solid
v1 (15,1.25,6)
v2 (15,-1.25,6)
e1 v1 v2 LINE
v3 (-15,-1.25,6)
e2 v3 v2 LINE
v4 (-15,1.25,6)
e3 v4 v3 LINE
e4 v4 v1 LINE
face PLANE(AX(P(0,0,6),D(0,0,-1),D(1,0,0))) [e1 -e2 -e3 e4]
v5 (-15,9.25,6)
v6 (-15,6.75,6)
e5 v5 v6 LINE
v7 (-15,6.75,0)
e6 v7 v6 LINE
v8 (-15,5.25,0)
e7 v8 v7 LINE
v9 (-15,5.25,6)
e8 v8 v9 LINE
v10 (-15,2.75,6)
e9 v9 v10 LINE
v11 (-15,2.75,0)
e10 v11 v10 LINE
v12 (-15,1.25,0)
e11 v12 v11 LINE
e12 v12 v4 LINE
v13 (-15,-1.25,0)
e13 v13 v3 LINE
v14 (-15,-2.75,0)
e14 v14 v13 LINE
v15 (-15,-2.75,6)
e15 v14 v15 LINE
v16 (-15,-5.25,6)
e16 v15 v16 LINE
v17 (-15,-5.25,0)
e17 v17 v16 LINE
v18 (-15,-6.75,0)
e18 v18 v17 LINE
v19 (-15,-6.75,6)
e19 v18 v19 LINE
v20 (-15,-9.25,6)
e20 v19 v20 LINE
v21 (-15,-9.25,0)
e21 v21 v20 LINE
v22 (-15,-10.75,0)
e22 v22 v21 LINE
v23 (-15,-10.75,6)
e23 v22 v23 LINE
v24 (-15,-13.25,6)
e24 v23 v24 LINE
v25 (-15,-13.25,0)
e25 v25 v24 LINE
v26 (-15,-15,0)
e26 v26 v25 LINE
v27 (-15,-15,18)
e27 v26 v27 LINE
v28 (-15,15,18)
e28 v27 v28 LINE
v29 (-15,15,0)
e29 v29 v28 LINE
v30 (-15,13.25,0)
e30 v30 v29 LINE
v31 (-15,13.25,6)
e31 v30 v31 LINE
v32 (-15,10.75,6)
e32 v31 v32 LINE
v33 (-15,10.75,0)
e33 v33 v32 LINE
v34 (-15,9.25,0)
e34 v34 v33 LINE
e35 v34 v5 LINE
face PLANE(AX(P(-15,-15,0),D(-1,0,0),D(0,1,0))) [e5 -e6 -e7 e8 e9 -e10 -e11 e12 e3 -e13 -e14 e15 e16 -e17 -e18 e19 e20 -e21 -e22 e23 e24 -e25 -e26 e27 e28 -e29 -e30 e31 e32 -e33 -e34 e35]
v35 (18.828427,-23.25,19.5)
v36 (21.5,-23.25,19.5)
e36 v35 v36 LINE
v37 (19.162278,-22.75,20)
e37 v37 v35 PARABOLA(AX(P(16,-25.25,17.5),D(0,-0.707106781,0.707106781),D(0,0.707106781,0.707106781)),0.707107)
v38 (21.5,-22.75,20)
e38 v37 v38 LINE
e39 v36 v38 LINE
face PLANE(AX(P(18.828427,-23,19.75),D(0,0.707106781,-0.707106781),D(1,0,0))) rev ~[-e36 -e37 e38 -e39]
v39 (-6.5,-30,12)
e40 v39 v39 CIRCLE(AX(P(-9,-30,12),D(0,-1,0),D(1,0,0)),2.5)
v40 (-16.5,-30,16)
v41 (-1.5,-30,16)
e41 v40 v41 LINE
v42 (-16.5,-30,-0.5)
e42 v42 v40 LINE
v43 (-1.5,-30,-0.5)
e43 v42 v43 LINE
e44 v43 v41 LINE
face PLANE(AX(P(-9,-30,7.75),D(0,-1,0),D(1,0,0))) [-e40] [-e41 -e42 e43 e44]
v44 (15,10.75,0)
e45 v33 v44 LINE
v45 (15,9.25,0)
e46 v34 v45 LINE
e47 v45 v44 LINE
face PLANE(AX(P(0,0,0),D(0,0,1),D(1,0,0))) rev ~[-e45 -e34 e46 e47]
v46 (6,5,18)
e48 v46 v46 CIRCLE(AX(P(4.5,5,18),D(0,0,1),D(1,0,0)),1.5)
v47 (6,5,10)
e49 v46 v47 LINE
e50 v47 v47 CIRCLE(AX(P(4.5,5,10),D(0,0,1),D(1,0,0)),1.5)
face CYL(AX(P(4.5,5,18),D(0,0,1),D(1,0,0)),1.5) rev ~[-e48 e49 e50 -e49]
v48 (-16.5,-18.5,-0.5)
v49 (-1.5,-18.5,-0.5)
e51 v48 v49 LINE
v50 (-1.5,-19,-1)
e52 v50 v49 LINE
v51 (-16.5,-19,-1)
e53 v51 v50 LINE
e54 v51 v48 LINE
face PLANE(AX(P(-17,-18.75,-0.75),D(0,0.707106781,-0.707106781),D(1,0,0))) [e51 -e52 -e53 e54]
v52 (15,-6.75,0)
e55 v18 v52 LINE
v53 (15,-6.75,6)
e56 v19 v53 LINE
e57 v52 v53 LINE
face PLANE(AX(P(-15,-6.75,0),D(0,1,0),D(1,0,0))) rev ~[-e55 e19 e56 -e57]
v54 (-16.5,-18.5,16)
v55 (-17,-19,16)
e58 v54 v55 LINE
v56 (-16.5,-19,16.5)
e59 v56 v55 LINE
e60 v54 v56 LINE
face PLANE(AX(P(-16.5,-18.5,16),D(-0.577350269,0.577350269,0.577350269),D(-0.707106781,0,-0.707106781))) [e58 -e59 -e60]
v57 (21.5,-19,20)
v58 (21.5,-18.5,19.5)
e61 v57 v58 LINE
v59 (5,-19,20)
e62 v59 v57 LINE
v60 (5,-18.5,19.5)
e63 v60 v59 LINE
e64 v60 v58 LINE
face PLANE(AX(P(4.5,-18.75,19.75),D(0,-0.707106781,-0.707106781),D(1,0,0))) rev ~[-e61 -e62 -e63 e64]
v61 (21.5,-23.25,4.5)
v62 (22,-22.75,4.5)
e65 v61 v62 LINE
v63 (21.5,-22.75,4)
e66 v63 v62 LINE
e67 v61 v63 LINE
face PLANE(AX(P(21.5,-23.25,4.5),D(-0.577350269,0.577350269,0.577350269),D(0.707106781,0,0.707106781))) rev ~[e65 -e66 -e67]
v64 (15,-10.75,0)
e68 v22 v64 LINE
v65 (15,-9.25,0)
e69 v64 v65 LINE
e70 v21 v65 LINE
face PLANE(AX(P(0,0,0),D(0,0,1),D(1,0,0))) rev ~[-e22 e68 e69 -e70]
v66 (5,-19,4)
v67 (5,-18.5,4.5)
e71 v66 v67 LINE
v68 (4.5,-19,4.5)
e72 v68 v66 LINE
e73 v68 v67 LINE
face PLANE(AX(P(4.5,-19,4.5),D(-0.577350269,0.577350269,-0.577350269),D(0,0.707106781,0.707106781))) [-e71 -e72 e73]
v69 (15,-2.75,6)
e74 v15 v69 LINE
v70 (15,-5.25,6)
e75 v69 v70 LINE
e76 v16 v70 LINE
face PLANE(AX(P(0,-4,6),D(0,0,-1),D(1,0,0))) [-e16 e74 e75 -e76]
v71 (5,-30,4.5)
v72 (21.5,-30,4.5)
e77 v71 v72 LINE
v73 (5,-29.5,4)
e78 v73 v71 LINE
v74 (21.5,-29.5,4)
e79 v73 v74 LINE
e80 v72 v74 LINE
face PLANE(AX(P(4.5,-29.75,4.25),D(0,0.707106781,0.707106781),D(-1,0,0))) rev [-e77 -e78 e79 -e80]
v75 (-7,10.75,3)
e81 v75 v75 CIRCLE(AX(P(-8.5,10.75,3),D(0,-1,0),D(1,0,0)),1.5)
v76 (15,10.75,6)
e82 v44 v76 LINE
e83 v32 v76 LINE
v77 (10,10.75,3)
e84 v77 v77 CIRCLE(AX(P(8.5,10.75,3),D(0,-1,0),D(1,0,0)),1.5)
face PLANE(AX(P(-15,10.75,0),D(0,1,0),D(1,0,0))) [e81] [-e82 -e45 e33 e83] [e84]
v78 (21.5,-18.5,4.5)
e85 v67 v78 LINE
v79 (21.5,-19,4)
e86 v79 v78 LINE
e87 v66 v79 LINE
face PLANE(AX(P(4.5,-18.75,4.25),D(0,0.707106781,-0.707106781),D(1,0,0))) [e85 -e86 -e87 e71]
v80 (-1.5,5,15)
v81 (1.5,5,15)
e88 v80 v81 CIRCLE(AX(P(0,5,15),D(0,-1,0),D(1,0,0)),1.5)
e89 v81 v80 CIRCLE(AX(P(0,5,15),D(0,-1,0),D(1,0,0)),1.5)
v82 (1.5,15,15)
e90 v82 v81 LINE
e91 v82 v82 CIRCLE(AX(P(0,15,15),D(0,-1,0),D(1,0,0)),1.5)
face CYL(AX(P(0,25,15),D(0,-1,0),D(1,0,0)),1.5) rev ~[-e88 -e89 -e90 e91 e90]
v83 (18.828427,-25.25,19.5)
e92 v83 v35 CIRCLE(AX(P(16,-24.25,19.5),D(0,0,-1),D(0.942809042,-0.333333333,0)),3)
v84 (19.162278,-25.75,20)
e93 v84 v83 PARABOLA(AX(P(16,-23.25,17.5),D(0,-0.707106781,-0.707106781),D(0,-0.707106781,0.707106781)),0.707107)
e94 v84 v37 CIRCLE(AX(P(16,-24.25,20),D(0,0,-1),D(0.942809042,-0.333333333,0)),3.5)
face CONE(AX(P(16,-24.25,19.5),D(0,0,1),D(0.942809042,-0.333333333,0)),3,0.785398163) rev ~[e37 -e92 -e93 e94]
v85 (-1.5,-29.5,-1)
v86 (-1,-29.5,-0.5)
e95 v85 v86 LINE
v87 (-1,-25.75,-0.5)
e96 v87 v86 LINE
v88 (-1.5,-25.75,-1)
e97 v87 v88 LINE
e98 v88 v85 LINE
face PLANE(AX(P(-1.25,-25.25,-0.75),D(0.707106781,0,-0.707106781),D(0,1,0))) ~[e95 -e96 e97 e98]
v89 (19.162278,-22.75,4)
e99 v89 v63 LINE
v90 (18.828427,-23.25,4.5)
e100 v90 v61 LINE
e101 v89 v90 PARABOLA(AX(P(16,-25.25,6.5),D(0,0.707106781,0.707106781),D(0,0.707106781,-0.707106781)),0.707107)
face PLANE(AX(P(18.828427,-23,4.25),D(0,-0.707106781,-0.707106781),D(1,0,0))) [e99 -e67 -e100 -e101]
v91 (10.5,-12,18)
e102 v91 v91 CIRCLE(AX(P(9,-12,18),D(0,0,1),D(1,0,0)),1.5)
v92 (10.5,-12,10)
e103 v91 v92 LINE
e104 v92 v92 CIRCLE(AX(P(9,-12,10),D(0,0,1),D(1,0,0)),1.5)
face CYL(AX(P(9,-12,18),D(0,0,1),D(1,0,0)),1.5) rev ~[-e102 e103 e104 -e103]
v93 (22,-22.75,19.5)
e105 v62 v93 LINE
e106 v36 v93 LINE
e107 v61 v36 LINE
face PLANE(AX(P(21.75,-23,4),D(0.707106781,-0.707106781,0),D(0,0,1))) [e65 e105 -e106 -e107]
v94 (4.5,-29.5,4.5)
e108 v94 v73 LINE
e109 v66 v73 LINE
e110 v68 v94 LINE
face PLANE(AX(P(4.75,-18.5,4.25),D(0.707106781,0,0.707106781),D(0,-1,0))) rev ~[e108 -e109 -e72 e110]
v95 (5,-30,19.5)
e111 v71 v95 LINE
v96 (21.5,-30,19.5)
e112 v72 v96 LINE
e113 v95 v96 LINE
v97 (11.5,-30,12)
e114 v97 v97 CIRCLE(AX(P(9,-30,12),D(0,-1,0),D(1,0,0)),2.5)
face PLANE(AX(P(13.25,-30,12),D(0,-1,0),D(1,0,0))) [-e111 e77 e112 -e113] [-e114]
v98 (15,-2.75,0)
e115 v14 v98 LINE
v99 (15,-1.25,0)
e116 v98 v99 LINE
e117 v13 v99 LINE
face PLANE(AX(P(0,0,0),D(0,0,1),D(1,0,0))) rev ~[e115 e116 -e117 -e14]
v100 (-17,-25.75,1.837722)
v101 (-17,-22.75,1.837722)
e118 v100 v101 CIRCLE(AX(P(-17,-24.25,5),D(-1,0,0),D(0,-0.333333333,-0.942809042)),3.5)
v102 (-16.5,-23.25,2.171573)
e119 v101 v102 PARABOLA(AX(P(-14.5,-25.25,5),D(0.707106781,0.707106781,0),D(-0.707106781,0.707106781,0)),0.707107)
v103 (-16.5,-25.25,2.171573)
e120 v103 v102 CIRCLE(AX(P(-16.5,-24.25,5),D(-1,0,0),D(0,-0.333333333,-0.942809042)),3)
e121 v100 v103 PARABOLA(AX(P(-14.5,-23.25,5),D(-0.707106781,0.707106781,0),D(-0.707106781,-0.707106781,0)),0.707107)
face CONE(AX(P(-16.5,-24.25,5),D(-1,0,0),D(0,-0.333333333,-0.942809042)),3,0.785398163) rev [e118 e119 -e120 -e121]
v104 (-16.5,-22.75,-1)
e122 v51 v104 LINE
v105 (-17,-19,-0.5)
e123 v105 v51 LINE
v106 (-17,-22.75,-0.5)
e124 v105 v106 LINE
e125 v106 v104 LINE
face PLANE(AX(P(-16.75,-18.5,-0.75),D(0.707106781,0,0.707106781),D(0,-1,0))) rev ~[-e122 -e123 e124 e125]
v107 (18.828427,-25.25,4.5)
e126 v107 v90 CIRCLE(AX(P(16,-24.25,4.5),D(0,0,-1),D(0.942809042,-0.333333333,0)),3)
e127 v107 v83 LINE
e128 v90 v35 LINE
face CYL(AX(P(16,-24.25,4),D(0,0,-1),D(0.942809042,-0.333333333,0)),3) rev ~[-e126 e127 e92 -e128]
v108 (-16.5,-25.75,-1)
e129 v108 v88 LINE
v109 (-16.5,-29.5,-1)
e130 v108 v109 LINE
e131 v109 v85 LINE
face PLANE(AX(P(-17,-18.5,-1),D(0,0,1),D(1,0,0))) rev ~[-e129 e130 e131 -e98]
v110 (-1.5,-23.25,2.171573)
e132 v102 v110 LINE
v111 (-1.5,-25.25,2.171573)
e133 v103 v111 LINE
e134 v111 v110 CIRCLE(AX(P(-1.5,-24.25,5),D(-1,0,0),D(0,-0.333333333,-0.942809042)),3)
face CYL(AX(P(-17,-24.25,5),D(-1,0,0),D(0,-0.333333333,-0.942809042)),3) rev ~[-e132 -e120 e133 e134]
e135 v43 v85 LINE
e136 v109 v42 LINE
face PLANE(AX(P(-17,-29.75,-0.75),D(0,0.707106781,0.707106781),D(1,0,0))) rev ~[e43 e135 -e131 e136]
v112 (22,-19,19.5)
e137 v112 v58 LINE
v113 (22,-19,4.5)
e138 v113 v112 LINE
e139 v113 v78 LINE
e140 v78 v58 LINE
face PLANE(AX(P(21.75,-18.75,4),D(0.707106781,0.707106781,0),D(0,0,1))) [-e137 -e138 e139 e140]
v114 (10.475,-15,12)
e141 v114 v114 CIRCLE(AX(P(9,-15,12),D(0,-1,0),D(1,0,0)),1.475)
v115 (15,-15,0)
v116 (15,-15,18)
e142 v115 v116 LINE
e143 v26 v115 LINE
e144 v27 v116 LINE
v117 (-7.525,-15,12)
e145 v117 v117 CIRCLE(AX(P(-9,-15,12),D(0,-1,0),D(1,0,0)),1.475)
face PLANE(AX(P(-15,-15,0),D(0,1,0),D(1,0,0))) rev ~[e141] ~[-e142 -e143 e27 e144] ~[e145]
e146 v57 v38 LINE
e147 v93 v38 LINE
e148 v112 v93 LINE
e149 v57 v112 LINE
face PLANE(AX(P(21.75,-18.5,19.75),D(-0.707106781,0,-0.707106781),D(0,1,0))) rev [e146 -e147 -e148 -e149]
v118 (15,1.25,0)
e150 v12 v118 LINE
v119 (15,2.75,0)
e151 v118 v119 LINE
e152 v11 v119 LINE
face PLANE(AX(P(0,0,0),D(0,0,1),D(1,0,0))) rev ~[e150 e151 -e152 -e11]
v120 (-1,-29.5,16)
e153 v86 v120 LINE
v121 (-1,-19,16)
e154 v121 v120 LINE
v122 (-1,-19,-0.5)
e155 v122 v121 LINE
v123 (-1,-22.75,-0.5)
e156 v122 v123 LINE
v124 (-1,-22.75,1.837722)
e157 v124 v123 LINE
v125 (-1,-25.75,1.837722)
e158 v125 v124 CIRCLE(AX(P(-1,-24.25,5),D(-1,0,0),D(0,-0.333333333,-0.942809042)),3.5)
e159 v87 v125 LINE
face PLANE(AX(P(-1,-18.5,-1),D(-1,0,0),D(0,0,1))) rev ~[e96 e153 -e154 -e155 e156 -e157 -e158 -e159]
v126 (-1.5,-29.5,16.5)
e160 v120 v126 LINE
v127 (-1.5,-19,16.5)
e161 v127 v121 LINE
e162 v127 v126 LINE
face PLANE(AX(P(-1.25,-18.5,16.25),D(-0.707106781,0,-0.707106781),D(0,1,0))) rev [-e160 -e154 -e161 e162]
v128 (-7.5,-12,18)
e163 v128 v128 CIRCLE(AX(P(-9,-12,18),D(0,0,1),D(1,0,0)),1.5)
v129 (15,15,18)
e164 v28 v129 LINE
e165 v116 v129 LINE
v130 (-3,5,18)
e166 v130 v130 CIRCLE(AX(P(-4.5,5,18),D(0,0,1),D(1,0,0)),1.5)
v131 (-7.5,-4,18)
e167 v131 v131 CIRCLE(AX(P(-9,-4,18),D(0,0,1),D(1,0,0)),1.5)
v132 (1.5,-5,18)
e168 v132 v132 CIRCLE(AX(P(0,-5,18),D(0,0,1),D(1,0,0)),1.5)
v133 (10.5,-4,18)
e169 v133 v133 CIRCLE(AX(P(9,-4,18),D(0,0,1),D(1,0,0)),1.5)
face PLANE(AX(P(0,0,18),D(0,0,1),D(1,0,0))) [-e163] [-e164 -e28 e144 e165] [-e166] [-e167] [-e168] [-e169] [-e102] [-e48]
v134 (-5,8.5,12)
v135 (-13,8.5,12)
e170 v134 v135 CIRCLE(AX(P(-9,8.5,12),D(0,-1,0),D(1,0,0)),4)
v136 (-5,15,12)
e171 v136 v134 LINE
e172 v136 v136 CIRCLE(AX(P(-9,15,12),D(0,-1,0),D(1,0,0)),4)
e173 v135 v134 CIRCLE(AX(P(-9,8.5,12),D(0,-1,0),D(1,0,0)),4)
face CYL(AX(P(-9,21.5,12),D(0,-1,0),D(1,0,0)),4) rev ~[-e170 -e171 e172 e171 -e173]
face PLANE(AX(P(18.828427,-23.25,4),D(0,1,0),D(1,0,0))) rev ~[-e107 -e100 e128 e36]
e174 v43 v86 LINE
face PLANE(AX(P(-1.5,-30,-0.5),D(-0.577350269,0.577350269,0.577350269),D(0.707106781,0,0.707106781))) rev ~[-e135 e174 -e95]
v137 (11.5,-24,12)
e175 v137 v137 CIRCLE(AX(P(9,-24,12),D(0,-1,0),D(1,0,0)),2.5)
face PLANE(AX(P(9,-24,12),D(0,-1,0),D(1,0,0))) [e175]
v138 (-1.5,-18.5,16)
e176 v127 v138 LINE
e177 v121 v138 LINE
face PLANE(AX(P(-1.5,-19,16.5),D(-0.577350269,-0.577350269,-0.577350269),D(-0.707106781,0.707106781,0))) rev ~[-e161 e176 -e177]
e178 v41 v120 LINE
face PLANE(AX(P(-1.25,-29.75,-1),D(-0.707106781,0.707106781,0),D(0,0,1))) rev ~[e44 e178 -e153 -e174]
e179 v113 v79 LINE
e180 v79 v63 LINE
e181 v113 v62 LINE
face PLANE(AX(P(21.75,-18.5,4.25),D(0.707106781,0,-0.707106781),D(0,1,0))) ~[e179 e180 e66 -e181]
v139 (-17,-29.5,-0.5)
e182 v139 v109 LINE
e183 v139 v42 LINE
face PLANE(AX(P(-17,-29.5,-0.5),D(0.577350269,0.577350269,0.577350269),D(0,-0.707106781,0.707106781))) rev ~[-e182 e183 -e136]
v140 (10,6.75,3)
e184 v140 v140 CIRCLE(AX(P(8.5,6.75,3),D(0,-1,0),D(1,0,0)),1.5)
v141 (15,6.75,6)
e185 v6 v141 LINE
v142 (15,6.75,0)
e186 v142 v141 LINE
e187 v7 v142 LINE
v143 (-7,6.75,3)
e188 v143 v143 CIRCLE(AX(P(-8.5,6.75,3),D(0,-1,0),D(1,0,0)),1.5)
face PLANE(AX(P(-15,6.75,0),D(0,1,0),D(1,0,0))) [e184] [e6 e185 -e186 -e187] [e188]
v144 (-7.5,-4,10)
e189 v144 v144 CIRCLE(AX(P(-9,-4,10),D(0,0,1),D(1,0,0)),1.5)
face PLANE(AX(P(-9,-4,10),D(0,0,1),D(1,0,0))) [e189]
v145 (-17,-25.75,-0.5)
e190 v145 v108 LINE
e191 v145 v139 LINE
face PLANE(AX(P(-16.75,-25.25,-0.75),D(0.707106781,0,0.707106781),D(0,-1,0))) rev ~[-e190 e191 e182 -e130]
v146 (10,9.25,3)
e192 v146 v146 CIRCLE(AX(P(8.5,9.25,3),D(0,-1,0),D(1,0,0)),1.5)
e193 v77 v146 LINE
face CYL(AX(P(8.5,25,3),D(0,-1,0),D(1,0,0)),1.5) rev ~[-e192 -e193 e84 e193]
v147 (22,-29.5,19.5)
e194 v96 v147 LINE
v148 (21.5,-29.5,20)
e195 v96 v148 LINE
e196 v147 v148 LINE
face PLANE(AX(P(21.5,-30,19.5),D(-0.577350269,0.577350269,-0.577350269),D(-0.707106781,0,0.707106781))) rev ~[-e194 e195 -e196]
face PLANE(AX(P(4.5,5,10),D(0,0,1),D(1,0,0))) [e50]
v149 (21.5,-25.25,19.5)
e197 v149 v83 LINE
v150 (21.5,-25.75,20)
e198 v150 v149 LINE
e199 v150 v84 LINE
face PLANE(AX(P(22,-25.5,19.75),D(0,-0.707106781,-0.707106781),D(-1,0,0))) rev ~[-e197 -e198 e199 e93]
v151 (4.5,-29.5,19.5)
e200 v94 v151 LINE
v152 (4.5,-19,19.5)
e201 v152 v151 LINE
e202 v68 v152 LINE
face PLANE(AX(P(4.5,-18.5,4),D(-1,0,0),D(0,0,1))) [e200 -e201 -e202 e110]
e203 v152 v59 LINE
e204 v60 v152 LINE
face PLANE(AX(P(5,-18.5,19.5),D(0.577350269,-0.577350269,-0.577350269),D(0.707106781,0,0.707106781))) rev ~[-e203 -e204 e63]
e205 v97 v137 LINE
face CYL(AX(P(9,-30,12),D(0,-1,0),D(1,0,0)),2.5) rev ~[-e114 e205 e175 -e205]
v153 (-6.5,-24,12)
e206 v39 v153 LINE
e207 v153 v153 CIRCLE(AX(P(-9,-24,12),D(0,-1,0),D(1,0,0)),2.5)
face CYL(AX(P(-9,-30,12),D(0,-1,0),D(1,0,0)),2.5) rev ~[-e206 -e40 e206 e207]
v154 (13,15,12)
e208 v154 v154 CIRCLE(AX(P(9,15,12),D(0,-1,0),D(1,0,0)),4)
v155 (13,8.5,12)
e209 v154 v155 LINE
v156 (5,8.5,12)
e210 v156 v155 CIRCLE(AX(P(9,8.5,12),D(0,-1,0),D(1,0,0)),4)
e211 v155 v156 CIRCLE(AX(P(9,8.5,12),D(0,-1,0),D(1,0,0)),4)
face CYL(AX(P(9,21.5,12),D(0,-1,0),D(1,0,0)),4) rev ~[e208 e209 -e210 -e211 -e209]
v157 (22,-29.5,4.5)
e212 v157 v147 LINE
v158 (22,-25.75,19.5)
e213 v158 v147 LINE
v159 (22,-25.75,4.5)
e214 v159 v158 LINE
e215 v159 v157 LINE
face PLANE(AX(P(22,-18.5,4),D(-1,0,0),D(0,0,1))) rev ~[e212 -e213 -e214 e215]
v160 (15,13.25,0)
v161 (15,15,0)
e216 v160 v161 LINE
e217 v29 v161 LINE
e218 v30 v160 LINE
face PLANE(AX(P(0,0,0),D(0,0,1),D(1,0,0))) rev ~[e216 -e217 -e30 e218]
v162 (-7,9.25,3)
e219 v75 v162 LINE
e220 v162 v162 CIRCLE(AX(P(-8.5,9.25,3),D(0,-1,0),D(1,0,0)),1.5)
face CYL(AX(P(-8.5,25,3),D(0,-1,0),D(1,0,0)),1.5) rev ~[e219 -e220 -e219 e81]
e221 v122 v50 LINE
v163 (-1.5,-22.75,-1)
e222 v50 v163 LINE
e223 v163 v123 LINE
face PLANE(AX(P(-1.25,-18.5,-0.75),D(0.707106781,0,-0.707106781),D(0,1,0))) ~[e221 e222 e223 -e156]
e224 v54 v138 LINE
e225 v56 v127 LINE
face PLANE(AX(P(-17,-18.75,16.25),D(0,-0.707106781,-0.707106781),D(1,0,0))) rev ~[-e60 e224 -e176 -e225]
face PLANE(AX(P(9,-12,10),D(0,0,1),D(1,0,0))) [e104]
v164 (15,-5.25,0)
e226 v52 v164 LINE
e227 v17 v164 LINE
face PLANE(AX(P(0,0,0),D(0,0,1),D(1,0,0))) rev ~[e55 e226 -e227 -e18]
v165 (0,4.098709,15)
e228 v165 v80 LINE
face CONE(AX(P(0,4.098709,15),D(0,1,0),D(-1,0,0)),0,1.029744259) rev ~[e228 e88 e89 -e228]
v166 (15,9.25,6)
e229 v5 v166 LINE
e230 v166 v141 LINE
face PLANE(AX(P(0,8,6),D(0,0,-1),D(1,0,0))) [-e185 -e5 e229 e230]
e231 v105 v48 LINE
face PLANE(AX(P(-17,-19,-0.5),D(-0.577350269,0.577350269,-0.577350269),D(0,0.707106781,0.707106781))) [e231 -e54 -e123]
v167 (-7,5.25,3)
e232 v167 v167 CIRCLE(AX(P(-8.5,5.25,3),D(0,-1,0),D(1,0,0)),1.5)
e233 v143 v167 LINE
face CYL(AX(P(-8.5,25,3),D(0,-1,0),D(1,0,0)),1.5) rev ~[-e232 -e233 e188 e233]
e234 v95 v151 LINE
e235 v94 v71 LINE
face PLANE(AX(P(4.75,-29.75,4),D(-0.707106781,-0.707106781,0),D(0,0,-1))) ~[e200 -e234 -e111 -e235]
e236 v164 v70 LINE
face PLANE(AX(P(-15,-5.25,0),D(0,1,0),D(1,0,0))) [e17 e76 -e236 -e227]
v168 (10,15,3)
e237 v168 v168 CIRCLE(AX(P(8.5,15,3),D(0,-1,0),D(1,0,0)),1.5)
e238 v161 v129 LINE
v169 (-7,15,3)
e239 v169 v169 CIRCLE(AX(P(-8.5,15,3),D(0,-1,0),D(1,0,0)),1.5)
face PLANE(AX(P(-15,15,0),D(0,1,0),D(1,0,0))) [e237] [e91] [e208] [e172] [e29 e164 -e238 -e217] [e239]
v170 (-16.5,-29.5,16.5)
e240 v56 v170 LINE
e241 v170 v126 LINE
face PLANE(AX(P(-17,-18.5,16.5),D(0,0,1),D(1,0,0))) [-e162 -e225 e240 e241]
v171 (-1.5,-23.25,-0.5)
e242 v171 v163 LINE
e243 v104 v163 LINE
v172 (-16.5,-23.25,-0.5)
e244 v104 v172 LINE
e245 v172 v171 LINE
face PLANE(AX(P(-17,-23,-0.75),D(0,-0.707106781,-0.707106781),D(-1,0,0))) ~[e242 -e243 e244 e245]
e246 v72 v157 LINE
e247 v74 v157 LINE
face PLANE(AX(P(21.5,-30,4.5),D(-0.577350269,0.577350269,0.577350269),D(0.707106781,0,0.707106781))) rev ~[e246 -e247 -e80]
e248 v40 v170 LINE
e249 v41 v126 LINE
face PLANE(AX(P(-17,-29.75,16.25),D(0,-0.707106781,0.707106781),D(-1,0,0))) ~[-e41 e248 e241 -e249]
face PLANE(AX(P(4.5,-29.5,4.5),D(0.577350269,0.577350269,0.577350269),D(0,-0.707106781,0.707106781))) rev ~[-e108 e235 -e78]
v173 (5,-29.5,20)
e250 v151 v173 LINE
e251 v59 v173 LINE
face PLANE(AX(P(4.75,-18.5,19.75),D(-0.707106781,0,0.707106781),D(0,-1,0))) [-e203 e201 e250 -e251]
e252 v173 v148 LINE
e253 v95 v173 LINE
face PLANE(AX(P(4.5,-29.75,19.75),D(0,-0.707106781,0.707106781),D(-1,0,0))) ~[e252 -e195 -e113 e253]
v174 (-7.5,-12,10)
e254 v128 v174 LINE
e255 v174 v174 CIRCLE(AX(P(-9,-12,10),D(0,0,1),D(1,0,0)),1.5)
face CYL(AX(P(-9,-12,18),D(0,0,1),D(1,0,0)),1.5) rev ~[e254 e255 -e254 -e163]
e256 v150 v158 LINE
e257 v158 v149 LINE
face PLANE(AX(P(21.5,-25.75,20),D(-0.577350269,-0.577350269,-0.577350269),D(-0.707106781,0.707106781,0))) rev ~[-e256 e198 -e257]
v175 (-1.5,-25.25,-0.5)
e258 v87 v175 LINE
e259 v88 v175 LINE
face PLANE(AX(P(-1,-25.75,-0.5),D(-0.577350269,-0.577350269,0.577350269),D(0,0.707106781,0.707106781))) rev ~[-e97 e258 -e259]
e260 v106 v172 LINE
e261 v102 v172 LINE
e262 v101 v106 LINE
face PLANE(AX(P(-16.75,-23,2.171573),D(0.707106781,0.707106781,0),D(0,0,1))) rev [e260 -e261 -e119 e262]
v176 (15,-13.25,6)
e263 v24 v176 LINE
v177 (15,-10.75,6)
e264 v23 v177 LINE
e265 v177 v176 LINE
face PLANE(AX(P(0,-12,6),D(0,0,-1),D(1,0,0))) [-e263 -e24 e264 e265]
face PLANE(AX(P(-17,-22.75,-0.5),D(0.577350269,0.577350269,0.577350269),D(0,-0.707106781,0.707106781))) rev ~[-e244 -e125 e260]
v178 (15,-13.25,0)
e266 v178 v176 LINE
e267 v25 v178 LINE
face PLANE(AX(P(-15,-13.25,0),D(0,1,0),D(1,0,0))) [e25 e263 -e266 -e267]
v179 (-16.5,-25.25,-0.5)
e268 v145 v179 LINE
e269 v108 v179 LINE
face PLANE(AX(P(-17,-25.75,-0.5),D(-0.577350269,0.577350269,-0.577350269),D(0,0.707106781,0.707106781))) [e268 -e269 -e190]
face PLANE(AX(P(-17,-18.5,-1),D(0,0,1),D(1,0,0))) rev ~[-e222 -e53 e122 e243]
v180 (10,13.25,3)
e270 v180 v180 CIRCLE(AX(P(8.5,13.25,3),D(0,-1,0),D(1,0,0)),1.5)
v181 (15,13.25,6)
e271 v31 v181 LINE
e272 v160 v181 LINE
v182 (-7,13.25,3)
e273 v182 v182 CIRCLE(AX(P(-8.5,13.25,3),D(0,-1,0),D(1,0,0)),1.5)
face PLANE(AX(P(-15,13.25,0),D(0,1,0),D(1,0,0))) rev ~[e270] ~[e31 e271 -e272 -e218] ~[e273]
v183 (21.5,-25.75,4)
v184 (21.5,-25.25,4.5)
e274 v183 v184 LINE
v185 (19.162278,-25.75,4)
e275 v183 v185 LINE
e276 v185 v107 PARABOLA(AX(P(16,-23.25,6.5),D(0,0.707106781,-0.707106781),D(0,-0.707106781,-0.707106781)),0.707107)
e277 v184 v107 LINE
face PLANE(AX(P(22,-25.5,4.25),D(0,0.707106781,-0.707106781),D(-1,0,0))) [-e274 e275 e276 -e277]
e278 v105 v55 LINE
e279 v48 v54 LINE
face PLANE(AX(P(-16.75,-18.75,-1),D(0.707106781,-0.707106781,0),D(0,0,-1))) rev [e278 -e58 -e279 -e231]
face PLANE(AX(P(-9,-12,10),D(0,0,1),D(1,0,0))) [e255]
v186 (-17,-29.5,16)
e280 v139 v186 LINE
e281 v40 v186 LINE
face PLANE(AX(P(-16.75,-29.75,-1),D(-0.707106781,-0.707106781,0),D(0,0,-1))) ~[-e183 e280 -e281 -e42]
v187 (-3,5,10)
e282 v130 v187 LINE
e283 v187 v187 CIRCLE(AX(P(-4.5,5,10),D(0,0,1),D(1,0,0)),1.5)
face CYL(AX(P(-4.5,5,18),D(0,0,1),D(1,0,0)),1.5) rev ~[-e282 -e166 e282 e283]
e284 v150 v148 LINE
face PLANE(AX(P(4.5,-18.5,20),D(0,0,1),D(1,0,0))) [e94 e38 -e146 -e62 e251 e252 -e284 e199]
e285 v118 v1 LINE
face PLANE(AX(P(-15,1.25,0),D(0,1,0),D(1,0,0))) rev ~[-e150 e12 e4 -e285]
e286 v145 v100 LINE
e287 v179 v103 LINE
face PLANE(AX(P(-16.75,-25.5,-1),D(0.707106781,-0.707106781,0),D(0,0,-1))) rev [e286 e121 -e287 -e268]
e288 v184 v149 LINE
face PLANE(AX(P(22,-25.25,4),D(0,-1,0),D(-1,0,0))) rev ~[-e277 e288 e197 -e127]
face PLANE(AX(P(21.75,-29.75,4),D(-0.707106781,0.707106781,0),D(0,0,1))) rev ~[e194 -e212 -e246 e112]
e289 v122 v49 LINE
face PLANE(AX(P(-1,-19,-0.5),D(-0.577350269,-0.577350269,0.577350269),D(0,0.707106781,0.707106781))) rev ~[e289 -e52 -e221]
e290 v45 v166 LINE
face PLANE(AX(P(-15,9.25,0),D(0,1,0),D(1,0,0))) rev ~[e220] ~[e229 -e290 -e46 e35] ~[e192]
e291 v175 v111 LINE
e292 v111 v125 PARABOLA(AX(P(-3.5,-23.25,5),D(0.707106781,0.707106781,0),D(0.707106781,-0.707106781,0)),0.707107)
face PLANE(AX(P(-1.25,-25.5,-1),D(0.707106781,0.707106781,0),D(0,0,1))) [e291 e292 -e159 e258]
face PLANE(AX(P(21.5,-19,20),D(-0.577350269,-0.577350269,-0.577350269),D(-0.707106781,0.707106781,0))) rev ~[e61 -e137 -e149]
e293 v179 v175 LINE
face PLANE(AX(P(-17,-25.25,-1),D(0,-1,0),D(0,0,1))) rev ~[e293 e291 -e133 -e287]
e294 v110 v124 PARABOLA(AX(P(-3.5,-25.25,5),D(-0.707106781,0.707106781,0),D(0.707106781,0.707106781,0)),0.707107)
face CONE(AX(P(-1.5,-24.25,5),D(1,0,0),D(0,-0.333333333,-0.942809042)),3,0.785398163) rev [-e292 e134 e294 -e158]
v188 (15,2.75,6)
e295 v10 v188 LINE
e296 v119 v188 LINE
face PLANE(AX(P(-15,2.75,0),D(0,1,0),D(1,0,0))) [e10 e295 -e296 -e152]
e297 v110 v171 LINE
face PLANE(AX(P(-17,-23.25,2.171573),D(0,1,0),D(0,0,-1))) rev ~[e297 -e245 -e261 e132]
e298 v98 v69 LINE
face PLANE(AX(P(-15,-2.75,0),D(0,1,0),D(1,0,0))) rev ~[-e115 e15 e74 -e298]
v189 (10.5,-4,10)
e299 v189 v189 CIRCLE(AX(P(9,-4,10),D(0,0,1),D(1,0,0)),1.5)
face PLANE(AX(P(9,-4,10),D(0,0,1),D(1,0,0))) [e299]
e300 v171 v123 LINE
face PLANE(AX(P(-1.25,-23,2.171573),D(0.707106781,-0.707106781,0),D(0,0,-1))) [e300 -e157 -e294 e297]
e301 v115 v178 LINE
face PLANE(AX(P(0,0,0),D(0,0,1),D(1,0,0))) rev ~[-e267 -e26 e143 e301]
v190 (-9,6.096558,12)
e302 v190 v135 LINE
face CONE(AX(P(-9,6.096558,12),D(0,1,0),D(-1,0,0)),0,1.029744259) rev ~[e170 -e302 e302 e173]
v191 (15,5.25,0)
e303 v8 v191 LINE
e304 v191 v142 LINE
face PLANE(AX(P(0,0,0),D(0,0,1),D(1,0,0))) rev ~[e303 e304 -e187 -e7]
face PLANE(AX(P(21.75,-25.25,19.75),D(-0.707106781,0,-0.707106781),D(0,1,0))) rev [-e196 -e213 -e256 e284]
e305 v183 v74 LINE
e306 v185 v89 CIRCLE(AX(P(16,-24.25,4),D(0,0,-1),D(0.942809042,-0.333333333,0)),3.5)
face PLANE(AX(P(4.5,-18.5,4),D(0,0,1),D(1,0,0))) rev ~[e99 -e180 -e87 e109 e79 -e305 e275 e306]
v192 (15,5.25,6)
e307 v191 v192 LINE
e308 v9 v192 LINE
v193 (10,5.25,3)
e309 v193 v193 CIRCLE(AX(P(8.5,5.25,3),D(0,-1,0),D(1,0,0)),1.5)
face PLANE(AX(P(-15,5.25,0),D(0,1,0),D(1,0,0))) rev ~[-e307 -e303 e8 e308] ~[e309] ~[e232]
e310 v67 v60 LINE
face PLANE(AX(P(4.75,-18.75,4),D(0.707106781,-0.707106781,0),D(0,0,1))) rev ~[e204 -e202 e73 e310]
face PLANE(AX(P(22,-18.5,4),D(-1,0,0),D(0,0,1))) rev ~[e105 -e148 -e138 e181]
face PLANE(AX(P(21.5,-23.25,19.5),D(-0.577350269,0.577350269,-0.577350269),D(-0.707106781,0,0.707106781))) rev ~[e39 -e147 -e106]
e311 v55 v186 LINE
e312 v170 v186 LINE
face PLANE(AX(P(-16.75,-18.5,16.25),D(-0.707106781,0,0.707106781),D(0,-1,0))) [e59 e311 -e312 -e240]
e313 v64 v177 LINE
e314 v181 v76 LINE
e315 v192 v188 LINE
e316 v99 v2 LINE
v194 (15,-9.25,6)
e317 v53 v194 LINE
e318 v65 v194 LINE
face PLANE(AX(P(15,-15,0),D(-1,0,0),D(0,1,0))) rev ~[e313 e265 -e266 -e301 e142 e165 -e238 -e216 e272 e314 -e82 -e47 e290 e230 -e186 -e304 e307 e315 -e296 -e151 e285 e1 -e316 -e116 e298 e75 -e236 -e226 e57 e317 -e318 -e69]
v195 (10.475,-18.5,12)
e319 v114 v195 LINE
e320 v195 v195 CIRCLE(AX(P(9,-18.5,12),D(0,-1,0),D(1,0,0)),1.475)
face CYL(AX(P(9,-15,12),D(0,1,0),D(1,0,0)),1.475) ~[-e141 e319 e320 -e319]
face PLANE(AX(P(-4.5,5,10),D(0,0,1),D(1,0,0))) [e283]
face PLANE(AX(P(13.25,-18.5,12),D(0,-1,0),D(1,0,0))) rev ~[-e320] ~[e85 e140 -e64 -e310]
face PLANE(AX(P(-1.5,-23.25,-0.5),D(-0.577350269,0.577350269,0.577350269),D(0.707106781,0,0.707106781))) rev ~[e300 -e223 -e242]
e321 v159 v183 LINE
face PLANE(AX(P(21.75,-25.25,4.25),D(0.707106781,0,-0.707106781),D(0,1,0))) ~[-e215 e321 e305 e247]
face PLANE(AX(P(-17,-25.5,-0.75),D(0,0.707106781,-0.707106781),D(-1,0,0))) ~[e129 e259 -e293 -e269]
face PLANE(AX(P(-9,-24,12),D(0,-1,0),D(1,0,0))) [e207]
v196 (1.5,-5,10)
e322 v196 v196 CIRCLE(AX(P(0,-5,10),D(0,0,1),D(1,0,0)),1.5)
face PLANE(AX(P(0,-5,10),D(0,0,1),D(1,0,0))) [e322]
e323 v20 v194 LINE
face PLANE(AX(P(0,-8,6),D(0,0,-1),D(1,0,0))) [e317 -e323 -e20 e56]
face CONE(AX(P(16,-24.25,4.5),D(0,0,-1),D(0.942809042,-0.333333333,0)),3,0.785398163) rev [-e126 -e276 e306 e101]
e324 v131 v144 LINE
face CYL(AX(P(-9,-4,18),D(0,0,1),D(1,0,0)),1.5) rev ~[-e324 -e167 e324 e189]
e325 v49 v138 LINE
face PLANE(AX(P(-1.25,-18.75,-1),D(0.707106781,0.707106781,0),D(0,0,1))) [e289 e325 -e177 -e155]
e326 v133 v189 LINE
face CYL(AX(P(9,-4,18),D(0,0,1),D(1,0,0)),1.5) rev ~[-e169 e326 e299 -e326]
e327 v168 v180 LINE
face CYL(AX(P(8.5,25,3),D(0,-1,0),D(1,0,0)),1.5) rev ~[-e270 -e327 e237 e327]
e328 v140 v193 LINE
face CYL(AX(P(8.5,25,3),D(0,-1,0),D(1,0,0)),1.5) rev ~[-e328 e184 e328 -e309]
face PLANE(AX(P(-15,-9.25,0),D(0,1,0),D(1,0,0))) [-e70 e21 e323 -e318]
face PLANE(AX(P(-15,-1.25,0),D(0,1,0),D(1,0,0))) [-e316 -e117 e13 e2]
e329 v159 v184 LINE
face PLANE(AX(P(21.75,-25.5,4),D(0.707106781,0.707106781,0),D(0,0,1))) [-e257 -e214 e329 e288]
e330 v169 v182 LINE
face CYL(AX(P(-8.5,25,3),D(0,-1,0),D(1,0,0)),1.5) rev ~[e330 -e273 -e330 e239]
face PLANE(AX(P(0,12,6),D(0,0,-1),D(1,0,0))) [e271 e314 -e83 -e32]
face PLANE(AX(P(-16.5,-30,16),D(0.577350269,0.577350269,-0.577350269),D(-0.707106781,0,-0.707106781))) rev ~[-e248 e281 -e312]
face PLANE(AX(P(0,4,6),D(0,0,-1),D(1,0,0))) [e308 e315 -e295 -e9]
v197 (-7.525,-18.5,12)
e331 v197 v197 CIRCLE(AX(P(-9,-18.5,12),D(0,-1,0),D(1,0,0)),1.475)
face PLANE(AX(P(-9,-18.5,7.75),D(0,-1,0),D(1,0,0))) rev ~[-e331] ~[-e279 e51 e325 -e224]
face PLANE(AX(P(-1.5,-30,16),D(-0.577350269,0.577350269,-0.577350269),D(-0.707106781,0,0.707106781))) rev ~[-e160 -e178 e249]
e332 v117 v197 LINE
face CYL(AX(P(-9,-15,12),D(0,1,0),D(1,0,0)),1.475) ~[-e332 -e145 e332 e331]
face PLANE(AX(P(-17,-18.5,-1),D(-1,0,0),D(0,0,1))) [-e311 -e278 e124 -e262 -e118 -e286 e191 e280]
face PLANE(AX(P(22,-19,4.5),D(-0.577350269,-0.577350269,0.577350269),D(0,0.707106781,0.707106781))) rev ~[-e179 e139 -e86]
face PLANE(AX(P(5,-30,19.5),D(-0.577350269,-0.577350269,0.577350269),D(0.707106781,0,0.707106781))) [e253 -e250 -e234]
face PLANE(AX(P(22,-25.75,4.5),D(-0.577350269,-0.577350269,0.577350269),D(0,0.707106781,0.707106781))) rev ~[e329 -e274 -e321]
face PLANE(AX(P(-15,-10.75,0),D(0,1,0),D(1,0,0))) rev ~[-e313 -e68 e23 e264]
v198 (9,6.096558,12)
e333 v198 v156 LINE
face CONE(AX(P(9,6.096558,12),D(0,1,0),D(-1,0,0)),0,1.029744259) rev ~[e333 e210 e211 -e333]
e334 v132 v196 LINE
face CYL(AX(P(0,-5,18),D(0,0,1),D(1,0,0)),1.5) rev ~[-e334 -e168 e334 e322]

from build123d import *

# Parameters (mm, degrees)
F0_W      = 30
F0_H      = 30
F11_DEPTH = 18
F1_D      = 8
F1_DEPTH  = 6.5
F1_TIP    = 2.4034424761
F13_W     = 30
F13_H     = 2.5
F14_DEPTH = 6
F15_D     = 3
F15_DEPTH = 10
F15_TIP   = 0.9012909285
F2_R      = 1.475
F3_DEPTH  = 3.5
F17_W     = 16
F17_H     = 17.5
F16_W     = 17.5
F16_H     = 16
F18_DEPTH = 11.5
F5_DEPTH  = 16
F21_DEPTH = 16
F8_SIZE   = 0.5
F7_R      = 1.5
F9_DEPTH  = 8
F20_R     = 2.5
F19_R     = 2.5
F10_DEPTH = 6


# Not quite as in the source:
# - a feature names something its author has since deleted; it is built from what else it names


with BuildPart() as f11:
    # F0 (on Top) → F11 (new body)
    with BuildSketch(Plane.XY):
        Rectangle(F0_W, F0_H)
    extrude(amount=F11_DEPTH)

    # F1
    with Locations(Plane(origin=(0, 15, 0), x_dir=(-1, 0, 0), z_dir=(0, 1, 0))):
        with Locations((-9, 12), (9, 12)):
            Hole(F1_D / 2, depth=F1_DEPTH)
            with Locations((0, 0, -(F1_DEPTH + F1_TIP / 2))):  # 118° drill point
                Cone(0, F1_D / 2, F1_TIP, mode=Mode.SUBTRACT)

    # F13 (on face) → F14 (cut)
    with BuildSketch(Plane(origin=(0, 0, 0), x_dir=(1, 0, 0), z_dir=(0, 0, -1))):
        with Locations((0, 12)):
            Rectangle(F13_W, F13_H)
        with Locations((0, 8)):
            Rectangle(F13_W, F13_H)
        with Locations((0, 4)):
            Rectangle(F13_W, F13_H)
        Rectangle(F13_W, F13_H)
        with Locations((0, -4)):
            Rectangle(F13_W, F13_H)
        with Locations((0, -8)):
            Rectangle(F13_W, F13_H)
        with Locations((0, -12)):
            Rectangle(F13_W, F13_H)
    extrude(amount=-F14_DEPTH, mode=Mode.SUBTRACT)

    # F15
    with Locations(Plane(origin=(0, 15, 0), x_dir=(-1, 0, 0), z_dir=(0, 1, 0))):
        with Locations((8.5, 3), (-8.5, 3), (0, 15)):
            Hole(F15_D / 2, depth=F15_DEPTH)
            with Locations((0, 0, -(F15_DEPTH + F15_TIP / 2))):  # 118° drill point
                Cone(0, F15_D / 2, F15_TIP, mode=Mode.SUBTRACT)

    # F2 (on face) → F3 (join)
    with BuildSketch(Plane.XZ.offset(15)):
        with Locations((-9, 12)):
            Circle(F2_R)
        with Locations((9, 12)):
            Circle(F2_R)
    extrude(amount=F3_DEPTH)

    # F17 (on face) + F16 (on face) → F18 (join)
    with BuildSketch(Plane.XZ.offset(18.5)):
        with Locations((-9, 7.75)):
            Rectangle(F17_W, F17_H)
    with BuildSketch(Plane.XZ.offset(18.5)):
        with Locations((13.25, 12)):
            Rectangle(F16_W, F16_H)
    extrude(amount=F18_DEPTH)

    # F4 (on face) → F5 (cut, through all)
    with BuildSketch(Plane(origin=(0, 0, 4), x_dir=(1, 0, 0), z_dir=(0, 0, -1))):
        with BuildLine():
            Line((22, 25.25), (18.8284271247, 25.25))
            ThreePointArc((18.8284271247, 25.25), (13, 24.25), (18.8284271247, 23.25))
            Line((18.8284271247, 23.25), (22, 23.25))
            Line((22, 23.25), (22, 25.25))
        make_face()
    extrude(amount=-F5_DEPTH, mode=Mode.SUBTRACT)

    # F6 (on face) → F21 (cut, through all)
    with BuildSketch(Plane(origin=(-17, 0, 0), x_dir=(0, -1, 0), z_dir=(-1, 0, 0))):
        with BuildLine():
            Line((25.25, -1), (25.25, 2.1715728753))
            ThreePointArc((25.25, 2.1715728753), (24.25, 8), (23.25, 2.1715728753))
            Line((23.25, 2.1715728753), (23.25, -1))
            Line((23.25, -1), (25.25, -1))
        make_face()
    extrude(amount=-F21_DEPTH, mode=Mode.SUBTRACT)

    # F8
    f8_edges = [f11.edges().sort_by_distance(p)[0] for p in [
        (13.25, -18.5, 4),
        (22, -20.875, 4),
        (20.414214, -23.25, 4),
        (13, -24.25, 4),
        (20.414214, -25.25, 4),
        (22, -27.625, 4),
        (13.25, -30, 4),
        (4.5, -24.25, 4),
        (4.5, -24.25, 20),
        (4.5, -18.5, 12),
        (4.5, -30, 12),
        (-9, -25.25, -1),
        (-1, -27.625, -1),
        (-9, -30, -1),
        (-17, -27.625, -1),
        (-9, -18.5, -1),
        (-1, -20.875, -1),
        (-9, -23.25, -1),
        (-17, -20.875, -1),
        (-1, -18.5, 7.75),
        (-1, -24.25, 16.5),
        (-1, -30, 7.75),
        (-1, -25.25, 0.585786),
        (-1, -24.25, 8),
        (-1, -23.25, 0.585786),
        (22, -18.5, 12),
        (22, -20.875, 20),
        (22, -23.25, 12),
        (22, -25.25, 12),
        (22, -27.625, 20),
        (22, -30, 12),
        (-17, -24.25, 16.5),
        (-9, -18.5, 16.5),
        (-9, -30, 16.5),
        (-17, -18.5, 7.75),
        (-17, -23.25, 0.585786),
        (-17, -24.25, 8),
        (-17, -25.25, 0.585786),
        (-17, -30, 7.75),
        (13.25, -18.5, 20),
        (13.25, -30, 20),
        (20.414214, -25.25, 20),
        (13, -24.25, 20),
        (20.414214, -23.25, 20),
    ]]
    chamfer(f8_edges, length=F8_SIZE)

    # F7 (on face) → F9 (cut)
    with BuildSketch(Plane.XY.offset(18)):
        with Locations((-9, -12)):
            Circle(F7_R)
        with Locations((-9, -4)):
            Circle(F7_R)
        with Locations((0, -5)):
            Circle(F7_R)
        with Locations((4.5, 5)):
            Circle(F7_R)
        with Locations((9, -4)):
            Circle(F7_R)
        with Locations((9, -12)):
            Circle(F7_R)
        with Locations((-4.5, 5)):
            Circle(F7_R)
    extrude(amount=-F9_DEPTH, mode=Mode.SUBTRACT)

    # F20 (on face) + F19 (on face) → F10 (cut)
    with BuildSketch(Plane.XZ.offset(30)):
        with Locations((-9, 12)):
            Circle(F20_R)
    with BuildSketch(Plane.XZ.offset(30)):
        with Locations((9, 12)):
            Circle(F19_R)
    extrude(amount=-F10_DEPTH, mode=Mode.SUBTRACT)


solid = f11.part
